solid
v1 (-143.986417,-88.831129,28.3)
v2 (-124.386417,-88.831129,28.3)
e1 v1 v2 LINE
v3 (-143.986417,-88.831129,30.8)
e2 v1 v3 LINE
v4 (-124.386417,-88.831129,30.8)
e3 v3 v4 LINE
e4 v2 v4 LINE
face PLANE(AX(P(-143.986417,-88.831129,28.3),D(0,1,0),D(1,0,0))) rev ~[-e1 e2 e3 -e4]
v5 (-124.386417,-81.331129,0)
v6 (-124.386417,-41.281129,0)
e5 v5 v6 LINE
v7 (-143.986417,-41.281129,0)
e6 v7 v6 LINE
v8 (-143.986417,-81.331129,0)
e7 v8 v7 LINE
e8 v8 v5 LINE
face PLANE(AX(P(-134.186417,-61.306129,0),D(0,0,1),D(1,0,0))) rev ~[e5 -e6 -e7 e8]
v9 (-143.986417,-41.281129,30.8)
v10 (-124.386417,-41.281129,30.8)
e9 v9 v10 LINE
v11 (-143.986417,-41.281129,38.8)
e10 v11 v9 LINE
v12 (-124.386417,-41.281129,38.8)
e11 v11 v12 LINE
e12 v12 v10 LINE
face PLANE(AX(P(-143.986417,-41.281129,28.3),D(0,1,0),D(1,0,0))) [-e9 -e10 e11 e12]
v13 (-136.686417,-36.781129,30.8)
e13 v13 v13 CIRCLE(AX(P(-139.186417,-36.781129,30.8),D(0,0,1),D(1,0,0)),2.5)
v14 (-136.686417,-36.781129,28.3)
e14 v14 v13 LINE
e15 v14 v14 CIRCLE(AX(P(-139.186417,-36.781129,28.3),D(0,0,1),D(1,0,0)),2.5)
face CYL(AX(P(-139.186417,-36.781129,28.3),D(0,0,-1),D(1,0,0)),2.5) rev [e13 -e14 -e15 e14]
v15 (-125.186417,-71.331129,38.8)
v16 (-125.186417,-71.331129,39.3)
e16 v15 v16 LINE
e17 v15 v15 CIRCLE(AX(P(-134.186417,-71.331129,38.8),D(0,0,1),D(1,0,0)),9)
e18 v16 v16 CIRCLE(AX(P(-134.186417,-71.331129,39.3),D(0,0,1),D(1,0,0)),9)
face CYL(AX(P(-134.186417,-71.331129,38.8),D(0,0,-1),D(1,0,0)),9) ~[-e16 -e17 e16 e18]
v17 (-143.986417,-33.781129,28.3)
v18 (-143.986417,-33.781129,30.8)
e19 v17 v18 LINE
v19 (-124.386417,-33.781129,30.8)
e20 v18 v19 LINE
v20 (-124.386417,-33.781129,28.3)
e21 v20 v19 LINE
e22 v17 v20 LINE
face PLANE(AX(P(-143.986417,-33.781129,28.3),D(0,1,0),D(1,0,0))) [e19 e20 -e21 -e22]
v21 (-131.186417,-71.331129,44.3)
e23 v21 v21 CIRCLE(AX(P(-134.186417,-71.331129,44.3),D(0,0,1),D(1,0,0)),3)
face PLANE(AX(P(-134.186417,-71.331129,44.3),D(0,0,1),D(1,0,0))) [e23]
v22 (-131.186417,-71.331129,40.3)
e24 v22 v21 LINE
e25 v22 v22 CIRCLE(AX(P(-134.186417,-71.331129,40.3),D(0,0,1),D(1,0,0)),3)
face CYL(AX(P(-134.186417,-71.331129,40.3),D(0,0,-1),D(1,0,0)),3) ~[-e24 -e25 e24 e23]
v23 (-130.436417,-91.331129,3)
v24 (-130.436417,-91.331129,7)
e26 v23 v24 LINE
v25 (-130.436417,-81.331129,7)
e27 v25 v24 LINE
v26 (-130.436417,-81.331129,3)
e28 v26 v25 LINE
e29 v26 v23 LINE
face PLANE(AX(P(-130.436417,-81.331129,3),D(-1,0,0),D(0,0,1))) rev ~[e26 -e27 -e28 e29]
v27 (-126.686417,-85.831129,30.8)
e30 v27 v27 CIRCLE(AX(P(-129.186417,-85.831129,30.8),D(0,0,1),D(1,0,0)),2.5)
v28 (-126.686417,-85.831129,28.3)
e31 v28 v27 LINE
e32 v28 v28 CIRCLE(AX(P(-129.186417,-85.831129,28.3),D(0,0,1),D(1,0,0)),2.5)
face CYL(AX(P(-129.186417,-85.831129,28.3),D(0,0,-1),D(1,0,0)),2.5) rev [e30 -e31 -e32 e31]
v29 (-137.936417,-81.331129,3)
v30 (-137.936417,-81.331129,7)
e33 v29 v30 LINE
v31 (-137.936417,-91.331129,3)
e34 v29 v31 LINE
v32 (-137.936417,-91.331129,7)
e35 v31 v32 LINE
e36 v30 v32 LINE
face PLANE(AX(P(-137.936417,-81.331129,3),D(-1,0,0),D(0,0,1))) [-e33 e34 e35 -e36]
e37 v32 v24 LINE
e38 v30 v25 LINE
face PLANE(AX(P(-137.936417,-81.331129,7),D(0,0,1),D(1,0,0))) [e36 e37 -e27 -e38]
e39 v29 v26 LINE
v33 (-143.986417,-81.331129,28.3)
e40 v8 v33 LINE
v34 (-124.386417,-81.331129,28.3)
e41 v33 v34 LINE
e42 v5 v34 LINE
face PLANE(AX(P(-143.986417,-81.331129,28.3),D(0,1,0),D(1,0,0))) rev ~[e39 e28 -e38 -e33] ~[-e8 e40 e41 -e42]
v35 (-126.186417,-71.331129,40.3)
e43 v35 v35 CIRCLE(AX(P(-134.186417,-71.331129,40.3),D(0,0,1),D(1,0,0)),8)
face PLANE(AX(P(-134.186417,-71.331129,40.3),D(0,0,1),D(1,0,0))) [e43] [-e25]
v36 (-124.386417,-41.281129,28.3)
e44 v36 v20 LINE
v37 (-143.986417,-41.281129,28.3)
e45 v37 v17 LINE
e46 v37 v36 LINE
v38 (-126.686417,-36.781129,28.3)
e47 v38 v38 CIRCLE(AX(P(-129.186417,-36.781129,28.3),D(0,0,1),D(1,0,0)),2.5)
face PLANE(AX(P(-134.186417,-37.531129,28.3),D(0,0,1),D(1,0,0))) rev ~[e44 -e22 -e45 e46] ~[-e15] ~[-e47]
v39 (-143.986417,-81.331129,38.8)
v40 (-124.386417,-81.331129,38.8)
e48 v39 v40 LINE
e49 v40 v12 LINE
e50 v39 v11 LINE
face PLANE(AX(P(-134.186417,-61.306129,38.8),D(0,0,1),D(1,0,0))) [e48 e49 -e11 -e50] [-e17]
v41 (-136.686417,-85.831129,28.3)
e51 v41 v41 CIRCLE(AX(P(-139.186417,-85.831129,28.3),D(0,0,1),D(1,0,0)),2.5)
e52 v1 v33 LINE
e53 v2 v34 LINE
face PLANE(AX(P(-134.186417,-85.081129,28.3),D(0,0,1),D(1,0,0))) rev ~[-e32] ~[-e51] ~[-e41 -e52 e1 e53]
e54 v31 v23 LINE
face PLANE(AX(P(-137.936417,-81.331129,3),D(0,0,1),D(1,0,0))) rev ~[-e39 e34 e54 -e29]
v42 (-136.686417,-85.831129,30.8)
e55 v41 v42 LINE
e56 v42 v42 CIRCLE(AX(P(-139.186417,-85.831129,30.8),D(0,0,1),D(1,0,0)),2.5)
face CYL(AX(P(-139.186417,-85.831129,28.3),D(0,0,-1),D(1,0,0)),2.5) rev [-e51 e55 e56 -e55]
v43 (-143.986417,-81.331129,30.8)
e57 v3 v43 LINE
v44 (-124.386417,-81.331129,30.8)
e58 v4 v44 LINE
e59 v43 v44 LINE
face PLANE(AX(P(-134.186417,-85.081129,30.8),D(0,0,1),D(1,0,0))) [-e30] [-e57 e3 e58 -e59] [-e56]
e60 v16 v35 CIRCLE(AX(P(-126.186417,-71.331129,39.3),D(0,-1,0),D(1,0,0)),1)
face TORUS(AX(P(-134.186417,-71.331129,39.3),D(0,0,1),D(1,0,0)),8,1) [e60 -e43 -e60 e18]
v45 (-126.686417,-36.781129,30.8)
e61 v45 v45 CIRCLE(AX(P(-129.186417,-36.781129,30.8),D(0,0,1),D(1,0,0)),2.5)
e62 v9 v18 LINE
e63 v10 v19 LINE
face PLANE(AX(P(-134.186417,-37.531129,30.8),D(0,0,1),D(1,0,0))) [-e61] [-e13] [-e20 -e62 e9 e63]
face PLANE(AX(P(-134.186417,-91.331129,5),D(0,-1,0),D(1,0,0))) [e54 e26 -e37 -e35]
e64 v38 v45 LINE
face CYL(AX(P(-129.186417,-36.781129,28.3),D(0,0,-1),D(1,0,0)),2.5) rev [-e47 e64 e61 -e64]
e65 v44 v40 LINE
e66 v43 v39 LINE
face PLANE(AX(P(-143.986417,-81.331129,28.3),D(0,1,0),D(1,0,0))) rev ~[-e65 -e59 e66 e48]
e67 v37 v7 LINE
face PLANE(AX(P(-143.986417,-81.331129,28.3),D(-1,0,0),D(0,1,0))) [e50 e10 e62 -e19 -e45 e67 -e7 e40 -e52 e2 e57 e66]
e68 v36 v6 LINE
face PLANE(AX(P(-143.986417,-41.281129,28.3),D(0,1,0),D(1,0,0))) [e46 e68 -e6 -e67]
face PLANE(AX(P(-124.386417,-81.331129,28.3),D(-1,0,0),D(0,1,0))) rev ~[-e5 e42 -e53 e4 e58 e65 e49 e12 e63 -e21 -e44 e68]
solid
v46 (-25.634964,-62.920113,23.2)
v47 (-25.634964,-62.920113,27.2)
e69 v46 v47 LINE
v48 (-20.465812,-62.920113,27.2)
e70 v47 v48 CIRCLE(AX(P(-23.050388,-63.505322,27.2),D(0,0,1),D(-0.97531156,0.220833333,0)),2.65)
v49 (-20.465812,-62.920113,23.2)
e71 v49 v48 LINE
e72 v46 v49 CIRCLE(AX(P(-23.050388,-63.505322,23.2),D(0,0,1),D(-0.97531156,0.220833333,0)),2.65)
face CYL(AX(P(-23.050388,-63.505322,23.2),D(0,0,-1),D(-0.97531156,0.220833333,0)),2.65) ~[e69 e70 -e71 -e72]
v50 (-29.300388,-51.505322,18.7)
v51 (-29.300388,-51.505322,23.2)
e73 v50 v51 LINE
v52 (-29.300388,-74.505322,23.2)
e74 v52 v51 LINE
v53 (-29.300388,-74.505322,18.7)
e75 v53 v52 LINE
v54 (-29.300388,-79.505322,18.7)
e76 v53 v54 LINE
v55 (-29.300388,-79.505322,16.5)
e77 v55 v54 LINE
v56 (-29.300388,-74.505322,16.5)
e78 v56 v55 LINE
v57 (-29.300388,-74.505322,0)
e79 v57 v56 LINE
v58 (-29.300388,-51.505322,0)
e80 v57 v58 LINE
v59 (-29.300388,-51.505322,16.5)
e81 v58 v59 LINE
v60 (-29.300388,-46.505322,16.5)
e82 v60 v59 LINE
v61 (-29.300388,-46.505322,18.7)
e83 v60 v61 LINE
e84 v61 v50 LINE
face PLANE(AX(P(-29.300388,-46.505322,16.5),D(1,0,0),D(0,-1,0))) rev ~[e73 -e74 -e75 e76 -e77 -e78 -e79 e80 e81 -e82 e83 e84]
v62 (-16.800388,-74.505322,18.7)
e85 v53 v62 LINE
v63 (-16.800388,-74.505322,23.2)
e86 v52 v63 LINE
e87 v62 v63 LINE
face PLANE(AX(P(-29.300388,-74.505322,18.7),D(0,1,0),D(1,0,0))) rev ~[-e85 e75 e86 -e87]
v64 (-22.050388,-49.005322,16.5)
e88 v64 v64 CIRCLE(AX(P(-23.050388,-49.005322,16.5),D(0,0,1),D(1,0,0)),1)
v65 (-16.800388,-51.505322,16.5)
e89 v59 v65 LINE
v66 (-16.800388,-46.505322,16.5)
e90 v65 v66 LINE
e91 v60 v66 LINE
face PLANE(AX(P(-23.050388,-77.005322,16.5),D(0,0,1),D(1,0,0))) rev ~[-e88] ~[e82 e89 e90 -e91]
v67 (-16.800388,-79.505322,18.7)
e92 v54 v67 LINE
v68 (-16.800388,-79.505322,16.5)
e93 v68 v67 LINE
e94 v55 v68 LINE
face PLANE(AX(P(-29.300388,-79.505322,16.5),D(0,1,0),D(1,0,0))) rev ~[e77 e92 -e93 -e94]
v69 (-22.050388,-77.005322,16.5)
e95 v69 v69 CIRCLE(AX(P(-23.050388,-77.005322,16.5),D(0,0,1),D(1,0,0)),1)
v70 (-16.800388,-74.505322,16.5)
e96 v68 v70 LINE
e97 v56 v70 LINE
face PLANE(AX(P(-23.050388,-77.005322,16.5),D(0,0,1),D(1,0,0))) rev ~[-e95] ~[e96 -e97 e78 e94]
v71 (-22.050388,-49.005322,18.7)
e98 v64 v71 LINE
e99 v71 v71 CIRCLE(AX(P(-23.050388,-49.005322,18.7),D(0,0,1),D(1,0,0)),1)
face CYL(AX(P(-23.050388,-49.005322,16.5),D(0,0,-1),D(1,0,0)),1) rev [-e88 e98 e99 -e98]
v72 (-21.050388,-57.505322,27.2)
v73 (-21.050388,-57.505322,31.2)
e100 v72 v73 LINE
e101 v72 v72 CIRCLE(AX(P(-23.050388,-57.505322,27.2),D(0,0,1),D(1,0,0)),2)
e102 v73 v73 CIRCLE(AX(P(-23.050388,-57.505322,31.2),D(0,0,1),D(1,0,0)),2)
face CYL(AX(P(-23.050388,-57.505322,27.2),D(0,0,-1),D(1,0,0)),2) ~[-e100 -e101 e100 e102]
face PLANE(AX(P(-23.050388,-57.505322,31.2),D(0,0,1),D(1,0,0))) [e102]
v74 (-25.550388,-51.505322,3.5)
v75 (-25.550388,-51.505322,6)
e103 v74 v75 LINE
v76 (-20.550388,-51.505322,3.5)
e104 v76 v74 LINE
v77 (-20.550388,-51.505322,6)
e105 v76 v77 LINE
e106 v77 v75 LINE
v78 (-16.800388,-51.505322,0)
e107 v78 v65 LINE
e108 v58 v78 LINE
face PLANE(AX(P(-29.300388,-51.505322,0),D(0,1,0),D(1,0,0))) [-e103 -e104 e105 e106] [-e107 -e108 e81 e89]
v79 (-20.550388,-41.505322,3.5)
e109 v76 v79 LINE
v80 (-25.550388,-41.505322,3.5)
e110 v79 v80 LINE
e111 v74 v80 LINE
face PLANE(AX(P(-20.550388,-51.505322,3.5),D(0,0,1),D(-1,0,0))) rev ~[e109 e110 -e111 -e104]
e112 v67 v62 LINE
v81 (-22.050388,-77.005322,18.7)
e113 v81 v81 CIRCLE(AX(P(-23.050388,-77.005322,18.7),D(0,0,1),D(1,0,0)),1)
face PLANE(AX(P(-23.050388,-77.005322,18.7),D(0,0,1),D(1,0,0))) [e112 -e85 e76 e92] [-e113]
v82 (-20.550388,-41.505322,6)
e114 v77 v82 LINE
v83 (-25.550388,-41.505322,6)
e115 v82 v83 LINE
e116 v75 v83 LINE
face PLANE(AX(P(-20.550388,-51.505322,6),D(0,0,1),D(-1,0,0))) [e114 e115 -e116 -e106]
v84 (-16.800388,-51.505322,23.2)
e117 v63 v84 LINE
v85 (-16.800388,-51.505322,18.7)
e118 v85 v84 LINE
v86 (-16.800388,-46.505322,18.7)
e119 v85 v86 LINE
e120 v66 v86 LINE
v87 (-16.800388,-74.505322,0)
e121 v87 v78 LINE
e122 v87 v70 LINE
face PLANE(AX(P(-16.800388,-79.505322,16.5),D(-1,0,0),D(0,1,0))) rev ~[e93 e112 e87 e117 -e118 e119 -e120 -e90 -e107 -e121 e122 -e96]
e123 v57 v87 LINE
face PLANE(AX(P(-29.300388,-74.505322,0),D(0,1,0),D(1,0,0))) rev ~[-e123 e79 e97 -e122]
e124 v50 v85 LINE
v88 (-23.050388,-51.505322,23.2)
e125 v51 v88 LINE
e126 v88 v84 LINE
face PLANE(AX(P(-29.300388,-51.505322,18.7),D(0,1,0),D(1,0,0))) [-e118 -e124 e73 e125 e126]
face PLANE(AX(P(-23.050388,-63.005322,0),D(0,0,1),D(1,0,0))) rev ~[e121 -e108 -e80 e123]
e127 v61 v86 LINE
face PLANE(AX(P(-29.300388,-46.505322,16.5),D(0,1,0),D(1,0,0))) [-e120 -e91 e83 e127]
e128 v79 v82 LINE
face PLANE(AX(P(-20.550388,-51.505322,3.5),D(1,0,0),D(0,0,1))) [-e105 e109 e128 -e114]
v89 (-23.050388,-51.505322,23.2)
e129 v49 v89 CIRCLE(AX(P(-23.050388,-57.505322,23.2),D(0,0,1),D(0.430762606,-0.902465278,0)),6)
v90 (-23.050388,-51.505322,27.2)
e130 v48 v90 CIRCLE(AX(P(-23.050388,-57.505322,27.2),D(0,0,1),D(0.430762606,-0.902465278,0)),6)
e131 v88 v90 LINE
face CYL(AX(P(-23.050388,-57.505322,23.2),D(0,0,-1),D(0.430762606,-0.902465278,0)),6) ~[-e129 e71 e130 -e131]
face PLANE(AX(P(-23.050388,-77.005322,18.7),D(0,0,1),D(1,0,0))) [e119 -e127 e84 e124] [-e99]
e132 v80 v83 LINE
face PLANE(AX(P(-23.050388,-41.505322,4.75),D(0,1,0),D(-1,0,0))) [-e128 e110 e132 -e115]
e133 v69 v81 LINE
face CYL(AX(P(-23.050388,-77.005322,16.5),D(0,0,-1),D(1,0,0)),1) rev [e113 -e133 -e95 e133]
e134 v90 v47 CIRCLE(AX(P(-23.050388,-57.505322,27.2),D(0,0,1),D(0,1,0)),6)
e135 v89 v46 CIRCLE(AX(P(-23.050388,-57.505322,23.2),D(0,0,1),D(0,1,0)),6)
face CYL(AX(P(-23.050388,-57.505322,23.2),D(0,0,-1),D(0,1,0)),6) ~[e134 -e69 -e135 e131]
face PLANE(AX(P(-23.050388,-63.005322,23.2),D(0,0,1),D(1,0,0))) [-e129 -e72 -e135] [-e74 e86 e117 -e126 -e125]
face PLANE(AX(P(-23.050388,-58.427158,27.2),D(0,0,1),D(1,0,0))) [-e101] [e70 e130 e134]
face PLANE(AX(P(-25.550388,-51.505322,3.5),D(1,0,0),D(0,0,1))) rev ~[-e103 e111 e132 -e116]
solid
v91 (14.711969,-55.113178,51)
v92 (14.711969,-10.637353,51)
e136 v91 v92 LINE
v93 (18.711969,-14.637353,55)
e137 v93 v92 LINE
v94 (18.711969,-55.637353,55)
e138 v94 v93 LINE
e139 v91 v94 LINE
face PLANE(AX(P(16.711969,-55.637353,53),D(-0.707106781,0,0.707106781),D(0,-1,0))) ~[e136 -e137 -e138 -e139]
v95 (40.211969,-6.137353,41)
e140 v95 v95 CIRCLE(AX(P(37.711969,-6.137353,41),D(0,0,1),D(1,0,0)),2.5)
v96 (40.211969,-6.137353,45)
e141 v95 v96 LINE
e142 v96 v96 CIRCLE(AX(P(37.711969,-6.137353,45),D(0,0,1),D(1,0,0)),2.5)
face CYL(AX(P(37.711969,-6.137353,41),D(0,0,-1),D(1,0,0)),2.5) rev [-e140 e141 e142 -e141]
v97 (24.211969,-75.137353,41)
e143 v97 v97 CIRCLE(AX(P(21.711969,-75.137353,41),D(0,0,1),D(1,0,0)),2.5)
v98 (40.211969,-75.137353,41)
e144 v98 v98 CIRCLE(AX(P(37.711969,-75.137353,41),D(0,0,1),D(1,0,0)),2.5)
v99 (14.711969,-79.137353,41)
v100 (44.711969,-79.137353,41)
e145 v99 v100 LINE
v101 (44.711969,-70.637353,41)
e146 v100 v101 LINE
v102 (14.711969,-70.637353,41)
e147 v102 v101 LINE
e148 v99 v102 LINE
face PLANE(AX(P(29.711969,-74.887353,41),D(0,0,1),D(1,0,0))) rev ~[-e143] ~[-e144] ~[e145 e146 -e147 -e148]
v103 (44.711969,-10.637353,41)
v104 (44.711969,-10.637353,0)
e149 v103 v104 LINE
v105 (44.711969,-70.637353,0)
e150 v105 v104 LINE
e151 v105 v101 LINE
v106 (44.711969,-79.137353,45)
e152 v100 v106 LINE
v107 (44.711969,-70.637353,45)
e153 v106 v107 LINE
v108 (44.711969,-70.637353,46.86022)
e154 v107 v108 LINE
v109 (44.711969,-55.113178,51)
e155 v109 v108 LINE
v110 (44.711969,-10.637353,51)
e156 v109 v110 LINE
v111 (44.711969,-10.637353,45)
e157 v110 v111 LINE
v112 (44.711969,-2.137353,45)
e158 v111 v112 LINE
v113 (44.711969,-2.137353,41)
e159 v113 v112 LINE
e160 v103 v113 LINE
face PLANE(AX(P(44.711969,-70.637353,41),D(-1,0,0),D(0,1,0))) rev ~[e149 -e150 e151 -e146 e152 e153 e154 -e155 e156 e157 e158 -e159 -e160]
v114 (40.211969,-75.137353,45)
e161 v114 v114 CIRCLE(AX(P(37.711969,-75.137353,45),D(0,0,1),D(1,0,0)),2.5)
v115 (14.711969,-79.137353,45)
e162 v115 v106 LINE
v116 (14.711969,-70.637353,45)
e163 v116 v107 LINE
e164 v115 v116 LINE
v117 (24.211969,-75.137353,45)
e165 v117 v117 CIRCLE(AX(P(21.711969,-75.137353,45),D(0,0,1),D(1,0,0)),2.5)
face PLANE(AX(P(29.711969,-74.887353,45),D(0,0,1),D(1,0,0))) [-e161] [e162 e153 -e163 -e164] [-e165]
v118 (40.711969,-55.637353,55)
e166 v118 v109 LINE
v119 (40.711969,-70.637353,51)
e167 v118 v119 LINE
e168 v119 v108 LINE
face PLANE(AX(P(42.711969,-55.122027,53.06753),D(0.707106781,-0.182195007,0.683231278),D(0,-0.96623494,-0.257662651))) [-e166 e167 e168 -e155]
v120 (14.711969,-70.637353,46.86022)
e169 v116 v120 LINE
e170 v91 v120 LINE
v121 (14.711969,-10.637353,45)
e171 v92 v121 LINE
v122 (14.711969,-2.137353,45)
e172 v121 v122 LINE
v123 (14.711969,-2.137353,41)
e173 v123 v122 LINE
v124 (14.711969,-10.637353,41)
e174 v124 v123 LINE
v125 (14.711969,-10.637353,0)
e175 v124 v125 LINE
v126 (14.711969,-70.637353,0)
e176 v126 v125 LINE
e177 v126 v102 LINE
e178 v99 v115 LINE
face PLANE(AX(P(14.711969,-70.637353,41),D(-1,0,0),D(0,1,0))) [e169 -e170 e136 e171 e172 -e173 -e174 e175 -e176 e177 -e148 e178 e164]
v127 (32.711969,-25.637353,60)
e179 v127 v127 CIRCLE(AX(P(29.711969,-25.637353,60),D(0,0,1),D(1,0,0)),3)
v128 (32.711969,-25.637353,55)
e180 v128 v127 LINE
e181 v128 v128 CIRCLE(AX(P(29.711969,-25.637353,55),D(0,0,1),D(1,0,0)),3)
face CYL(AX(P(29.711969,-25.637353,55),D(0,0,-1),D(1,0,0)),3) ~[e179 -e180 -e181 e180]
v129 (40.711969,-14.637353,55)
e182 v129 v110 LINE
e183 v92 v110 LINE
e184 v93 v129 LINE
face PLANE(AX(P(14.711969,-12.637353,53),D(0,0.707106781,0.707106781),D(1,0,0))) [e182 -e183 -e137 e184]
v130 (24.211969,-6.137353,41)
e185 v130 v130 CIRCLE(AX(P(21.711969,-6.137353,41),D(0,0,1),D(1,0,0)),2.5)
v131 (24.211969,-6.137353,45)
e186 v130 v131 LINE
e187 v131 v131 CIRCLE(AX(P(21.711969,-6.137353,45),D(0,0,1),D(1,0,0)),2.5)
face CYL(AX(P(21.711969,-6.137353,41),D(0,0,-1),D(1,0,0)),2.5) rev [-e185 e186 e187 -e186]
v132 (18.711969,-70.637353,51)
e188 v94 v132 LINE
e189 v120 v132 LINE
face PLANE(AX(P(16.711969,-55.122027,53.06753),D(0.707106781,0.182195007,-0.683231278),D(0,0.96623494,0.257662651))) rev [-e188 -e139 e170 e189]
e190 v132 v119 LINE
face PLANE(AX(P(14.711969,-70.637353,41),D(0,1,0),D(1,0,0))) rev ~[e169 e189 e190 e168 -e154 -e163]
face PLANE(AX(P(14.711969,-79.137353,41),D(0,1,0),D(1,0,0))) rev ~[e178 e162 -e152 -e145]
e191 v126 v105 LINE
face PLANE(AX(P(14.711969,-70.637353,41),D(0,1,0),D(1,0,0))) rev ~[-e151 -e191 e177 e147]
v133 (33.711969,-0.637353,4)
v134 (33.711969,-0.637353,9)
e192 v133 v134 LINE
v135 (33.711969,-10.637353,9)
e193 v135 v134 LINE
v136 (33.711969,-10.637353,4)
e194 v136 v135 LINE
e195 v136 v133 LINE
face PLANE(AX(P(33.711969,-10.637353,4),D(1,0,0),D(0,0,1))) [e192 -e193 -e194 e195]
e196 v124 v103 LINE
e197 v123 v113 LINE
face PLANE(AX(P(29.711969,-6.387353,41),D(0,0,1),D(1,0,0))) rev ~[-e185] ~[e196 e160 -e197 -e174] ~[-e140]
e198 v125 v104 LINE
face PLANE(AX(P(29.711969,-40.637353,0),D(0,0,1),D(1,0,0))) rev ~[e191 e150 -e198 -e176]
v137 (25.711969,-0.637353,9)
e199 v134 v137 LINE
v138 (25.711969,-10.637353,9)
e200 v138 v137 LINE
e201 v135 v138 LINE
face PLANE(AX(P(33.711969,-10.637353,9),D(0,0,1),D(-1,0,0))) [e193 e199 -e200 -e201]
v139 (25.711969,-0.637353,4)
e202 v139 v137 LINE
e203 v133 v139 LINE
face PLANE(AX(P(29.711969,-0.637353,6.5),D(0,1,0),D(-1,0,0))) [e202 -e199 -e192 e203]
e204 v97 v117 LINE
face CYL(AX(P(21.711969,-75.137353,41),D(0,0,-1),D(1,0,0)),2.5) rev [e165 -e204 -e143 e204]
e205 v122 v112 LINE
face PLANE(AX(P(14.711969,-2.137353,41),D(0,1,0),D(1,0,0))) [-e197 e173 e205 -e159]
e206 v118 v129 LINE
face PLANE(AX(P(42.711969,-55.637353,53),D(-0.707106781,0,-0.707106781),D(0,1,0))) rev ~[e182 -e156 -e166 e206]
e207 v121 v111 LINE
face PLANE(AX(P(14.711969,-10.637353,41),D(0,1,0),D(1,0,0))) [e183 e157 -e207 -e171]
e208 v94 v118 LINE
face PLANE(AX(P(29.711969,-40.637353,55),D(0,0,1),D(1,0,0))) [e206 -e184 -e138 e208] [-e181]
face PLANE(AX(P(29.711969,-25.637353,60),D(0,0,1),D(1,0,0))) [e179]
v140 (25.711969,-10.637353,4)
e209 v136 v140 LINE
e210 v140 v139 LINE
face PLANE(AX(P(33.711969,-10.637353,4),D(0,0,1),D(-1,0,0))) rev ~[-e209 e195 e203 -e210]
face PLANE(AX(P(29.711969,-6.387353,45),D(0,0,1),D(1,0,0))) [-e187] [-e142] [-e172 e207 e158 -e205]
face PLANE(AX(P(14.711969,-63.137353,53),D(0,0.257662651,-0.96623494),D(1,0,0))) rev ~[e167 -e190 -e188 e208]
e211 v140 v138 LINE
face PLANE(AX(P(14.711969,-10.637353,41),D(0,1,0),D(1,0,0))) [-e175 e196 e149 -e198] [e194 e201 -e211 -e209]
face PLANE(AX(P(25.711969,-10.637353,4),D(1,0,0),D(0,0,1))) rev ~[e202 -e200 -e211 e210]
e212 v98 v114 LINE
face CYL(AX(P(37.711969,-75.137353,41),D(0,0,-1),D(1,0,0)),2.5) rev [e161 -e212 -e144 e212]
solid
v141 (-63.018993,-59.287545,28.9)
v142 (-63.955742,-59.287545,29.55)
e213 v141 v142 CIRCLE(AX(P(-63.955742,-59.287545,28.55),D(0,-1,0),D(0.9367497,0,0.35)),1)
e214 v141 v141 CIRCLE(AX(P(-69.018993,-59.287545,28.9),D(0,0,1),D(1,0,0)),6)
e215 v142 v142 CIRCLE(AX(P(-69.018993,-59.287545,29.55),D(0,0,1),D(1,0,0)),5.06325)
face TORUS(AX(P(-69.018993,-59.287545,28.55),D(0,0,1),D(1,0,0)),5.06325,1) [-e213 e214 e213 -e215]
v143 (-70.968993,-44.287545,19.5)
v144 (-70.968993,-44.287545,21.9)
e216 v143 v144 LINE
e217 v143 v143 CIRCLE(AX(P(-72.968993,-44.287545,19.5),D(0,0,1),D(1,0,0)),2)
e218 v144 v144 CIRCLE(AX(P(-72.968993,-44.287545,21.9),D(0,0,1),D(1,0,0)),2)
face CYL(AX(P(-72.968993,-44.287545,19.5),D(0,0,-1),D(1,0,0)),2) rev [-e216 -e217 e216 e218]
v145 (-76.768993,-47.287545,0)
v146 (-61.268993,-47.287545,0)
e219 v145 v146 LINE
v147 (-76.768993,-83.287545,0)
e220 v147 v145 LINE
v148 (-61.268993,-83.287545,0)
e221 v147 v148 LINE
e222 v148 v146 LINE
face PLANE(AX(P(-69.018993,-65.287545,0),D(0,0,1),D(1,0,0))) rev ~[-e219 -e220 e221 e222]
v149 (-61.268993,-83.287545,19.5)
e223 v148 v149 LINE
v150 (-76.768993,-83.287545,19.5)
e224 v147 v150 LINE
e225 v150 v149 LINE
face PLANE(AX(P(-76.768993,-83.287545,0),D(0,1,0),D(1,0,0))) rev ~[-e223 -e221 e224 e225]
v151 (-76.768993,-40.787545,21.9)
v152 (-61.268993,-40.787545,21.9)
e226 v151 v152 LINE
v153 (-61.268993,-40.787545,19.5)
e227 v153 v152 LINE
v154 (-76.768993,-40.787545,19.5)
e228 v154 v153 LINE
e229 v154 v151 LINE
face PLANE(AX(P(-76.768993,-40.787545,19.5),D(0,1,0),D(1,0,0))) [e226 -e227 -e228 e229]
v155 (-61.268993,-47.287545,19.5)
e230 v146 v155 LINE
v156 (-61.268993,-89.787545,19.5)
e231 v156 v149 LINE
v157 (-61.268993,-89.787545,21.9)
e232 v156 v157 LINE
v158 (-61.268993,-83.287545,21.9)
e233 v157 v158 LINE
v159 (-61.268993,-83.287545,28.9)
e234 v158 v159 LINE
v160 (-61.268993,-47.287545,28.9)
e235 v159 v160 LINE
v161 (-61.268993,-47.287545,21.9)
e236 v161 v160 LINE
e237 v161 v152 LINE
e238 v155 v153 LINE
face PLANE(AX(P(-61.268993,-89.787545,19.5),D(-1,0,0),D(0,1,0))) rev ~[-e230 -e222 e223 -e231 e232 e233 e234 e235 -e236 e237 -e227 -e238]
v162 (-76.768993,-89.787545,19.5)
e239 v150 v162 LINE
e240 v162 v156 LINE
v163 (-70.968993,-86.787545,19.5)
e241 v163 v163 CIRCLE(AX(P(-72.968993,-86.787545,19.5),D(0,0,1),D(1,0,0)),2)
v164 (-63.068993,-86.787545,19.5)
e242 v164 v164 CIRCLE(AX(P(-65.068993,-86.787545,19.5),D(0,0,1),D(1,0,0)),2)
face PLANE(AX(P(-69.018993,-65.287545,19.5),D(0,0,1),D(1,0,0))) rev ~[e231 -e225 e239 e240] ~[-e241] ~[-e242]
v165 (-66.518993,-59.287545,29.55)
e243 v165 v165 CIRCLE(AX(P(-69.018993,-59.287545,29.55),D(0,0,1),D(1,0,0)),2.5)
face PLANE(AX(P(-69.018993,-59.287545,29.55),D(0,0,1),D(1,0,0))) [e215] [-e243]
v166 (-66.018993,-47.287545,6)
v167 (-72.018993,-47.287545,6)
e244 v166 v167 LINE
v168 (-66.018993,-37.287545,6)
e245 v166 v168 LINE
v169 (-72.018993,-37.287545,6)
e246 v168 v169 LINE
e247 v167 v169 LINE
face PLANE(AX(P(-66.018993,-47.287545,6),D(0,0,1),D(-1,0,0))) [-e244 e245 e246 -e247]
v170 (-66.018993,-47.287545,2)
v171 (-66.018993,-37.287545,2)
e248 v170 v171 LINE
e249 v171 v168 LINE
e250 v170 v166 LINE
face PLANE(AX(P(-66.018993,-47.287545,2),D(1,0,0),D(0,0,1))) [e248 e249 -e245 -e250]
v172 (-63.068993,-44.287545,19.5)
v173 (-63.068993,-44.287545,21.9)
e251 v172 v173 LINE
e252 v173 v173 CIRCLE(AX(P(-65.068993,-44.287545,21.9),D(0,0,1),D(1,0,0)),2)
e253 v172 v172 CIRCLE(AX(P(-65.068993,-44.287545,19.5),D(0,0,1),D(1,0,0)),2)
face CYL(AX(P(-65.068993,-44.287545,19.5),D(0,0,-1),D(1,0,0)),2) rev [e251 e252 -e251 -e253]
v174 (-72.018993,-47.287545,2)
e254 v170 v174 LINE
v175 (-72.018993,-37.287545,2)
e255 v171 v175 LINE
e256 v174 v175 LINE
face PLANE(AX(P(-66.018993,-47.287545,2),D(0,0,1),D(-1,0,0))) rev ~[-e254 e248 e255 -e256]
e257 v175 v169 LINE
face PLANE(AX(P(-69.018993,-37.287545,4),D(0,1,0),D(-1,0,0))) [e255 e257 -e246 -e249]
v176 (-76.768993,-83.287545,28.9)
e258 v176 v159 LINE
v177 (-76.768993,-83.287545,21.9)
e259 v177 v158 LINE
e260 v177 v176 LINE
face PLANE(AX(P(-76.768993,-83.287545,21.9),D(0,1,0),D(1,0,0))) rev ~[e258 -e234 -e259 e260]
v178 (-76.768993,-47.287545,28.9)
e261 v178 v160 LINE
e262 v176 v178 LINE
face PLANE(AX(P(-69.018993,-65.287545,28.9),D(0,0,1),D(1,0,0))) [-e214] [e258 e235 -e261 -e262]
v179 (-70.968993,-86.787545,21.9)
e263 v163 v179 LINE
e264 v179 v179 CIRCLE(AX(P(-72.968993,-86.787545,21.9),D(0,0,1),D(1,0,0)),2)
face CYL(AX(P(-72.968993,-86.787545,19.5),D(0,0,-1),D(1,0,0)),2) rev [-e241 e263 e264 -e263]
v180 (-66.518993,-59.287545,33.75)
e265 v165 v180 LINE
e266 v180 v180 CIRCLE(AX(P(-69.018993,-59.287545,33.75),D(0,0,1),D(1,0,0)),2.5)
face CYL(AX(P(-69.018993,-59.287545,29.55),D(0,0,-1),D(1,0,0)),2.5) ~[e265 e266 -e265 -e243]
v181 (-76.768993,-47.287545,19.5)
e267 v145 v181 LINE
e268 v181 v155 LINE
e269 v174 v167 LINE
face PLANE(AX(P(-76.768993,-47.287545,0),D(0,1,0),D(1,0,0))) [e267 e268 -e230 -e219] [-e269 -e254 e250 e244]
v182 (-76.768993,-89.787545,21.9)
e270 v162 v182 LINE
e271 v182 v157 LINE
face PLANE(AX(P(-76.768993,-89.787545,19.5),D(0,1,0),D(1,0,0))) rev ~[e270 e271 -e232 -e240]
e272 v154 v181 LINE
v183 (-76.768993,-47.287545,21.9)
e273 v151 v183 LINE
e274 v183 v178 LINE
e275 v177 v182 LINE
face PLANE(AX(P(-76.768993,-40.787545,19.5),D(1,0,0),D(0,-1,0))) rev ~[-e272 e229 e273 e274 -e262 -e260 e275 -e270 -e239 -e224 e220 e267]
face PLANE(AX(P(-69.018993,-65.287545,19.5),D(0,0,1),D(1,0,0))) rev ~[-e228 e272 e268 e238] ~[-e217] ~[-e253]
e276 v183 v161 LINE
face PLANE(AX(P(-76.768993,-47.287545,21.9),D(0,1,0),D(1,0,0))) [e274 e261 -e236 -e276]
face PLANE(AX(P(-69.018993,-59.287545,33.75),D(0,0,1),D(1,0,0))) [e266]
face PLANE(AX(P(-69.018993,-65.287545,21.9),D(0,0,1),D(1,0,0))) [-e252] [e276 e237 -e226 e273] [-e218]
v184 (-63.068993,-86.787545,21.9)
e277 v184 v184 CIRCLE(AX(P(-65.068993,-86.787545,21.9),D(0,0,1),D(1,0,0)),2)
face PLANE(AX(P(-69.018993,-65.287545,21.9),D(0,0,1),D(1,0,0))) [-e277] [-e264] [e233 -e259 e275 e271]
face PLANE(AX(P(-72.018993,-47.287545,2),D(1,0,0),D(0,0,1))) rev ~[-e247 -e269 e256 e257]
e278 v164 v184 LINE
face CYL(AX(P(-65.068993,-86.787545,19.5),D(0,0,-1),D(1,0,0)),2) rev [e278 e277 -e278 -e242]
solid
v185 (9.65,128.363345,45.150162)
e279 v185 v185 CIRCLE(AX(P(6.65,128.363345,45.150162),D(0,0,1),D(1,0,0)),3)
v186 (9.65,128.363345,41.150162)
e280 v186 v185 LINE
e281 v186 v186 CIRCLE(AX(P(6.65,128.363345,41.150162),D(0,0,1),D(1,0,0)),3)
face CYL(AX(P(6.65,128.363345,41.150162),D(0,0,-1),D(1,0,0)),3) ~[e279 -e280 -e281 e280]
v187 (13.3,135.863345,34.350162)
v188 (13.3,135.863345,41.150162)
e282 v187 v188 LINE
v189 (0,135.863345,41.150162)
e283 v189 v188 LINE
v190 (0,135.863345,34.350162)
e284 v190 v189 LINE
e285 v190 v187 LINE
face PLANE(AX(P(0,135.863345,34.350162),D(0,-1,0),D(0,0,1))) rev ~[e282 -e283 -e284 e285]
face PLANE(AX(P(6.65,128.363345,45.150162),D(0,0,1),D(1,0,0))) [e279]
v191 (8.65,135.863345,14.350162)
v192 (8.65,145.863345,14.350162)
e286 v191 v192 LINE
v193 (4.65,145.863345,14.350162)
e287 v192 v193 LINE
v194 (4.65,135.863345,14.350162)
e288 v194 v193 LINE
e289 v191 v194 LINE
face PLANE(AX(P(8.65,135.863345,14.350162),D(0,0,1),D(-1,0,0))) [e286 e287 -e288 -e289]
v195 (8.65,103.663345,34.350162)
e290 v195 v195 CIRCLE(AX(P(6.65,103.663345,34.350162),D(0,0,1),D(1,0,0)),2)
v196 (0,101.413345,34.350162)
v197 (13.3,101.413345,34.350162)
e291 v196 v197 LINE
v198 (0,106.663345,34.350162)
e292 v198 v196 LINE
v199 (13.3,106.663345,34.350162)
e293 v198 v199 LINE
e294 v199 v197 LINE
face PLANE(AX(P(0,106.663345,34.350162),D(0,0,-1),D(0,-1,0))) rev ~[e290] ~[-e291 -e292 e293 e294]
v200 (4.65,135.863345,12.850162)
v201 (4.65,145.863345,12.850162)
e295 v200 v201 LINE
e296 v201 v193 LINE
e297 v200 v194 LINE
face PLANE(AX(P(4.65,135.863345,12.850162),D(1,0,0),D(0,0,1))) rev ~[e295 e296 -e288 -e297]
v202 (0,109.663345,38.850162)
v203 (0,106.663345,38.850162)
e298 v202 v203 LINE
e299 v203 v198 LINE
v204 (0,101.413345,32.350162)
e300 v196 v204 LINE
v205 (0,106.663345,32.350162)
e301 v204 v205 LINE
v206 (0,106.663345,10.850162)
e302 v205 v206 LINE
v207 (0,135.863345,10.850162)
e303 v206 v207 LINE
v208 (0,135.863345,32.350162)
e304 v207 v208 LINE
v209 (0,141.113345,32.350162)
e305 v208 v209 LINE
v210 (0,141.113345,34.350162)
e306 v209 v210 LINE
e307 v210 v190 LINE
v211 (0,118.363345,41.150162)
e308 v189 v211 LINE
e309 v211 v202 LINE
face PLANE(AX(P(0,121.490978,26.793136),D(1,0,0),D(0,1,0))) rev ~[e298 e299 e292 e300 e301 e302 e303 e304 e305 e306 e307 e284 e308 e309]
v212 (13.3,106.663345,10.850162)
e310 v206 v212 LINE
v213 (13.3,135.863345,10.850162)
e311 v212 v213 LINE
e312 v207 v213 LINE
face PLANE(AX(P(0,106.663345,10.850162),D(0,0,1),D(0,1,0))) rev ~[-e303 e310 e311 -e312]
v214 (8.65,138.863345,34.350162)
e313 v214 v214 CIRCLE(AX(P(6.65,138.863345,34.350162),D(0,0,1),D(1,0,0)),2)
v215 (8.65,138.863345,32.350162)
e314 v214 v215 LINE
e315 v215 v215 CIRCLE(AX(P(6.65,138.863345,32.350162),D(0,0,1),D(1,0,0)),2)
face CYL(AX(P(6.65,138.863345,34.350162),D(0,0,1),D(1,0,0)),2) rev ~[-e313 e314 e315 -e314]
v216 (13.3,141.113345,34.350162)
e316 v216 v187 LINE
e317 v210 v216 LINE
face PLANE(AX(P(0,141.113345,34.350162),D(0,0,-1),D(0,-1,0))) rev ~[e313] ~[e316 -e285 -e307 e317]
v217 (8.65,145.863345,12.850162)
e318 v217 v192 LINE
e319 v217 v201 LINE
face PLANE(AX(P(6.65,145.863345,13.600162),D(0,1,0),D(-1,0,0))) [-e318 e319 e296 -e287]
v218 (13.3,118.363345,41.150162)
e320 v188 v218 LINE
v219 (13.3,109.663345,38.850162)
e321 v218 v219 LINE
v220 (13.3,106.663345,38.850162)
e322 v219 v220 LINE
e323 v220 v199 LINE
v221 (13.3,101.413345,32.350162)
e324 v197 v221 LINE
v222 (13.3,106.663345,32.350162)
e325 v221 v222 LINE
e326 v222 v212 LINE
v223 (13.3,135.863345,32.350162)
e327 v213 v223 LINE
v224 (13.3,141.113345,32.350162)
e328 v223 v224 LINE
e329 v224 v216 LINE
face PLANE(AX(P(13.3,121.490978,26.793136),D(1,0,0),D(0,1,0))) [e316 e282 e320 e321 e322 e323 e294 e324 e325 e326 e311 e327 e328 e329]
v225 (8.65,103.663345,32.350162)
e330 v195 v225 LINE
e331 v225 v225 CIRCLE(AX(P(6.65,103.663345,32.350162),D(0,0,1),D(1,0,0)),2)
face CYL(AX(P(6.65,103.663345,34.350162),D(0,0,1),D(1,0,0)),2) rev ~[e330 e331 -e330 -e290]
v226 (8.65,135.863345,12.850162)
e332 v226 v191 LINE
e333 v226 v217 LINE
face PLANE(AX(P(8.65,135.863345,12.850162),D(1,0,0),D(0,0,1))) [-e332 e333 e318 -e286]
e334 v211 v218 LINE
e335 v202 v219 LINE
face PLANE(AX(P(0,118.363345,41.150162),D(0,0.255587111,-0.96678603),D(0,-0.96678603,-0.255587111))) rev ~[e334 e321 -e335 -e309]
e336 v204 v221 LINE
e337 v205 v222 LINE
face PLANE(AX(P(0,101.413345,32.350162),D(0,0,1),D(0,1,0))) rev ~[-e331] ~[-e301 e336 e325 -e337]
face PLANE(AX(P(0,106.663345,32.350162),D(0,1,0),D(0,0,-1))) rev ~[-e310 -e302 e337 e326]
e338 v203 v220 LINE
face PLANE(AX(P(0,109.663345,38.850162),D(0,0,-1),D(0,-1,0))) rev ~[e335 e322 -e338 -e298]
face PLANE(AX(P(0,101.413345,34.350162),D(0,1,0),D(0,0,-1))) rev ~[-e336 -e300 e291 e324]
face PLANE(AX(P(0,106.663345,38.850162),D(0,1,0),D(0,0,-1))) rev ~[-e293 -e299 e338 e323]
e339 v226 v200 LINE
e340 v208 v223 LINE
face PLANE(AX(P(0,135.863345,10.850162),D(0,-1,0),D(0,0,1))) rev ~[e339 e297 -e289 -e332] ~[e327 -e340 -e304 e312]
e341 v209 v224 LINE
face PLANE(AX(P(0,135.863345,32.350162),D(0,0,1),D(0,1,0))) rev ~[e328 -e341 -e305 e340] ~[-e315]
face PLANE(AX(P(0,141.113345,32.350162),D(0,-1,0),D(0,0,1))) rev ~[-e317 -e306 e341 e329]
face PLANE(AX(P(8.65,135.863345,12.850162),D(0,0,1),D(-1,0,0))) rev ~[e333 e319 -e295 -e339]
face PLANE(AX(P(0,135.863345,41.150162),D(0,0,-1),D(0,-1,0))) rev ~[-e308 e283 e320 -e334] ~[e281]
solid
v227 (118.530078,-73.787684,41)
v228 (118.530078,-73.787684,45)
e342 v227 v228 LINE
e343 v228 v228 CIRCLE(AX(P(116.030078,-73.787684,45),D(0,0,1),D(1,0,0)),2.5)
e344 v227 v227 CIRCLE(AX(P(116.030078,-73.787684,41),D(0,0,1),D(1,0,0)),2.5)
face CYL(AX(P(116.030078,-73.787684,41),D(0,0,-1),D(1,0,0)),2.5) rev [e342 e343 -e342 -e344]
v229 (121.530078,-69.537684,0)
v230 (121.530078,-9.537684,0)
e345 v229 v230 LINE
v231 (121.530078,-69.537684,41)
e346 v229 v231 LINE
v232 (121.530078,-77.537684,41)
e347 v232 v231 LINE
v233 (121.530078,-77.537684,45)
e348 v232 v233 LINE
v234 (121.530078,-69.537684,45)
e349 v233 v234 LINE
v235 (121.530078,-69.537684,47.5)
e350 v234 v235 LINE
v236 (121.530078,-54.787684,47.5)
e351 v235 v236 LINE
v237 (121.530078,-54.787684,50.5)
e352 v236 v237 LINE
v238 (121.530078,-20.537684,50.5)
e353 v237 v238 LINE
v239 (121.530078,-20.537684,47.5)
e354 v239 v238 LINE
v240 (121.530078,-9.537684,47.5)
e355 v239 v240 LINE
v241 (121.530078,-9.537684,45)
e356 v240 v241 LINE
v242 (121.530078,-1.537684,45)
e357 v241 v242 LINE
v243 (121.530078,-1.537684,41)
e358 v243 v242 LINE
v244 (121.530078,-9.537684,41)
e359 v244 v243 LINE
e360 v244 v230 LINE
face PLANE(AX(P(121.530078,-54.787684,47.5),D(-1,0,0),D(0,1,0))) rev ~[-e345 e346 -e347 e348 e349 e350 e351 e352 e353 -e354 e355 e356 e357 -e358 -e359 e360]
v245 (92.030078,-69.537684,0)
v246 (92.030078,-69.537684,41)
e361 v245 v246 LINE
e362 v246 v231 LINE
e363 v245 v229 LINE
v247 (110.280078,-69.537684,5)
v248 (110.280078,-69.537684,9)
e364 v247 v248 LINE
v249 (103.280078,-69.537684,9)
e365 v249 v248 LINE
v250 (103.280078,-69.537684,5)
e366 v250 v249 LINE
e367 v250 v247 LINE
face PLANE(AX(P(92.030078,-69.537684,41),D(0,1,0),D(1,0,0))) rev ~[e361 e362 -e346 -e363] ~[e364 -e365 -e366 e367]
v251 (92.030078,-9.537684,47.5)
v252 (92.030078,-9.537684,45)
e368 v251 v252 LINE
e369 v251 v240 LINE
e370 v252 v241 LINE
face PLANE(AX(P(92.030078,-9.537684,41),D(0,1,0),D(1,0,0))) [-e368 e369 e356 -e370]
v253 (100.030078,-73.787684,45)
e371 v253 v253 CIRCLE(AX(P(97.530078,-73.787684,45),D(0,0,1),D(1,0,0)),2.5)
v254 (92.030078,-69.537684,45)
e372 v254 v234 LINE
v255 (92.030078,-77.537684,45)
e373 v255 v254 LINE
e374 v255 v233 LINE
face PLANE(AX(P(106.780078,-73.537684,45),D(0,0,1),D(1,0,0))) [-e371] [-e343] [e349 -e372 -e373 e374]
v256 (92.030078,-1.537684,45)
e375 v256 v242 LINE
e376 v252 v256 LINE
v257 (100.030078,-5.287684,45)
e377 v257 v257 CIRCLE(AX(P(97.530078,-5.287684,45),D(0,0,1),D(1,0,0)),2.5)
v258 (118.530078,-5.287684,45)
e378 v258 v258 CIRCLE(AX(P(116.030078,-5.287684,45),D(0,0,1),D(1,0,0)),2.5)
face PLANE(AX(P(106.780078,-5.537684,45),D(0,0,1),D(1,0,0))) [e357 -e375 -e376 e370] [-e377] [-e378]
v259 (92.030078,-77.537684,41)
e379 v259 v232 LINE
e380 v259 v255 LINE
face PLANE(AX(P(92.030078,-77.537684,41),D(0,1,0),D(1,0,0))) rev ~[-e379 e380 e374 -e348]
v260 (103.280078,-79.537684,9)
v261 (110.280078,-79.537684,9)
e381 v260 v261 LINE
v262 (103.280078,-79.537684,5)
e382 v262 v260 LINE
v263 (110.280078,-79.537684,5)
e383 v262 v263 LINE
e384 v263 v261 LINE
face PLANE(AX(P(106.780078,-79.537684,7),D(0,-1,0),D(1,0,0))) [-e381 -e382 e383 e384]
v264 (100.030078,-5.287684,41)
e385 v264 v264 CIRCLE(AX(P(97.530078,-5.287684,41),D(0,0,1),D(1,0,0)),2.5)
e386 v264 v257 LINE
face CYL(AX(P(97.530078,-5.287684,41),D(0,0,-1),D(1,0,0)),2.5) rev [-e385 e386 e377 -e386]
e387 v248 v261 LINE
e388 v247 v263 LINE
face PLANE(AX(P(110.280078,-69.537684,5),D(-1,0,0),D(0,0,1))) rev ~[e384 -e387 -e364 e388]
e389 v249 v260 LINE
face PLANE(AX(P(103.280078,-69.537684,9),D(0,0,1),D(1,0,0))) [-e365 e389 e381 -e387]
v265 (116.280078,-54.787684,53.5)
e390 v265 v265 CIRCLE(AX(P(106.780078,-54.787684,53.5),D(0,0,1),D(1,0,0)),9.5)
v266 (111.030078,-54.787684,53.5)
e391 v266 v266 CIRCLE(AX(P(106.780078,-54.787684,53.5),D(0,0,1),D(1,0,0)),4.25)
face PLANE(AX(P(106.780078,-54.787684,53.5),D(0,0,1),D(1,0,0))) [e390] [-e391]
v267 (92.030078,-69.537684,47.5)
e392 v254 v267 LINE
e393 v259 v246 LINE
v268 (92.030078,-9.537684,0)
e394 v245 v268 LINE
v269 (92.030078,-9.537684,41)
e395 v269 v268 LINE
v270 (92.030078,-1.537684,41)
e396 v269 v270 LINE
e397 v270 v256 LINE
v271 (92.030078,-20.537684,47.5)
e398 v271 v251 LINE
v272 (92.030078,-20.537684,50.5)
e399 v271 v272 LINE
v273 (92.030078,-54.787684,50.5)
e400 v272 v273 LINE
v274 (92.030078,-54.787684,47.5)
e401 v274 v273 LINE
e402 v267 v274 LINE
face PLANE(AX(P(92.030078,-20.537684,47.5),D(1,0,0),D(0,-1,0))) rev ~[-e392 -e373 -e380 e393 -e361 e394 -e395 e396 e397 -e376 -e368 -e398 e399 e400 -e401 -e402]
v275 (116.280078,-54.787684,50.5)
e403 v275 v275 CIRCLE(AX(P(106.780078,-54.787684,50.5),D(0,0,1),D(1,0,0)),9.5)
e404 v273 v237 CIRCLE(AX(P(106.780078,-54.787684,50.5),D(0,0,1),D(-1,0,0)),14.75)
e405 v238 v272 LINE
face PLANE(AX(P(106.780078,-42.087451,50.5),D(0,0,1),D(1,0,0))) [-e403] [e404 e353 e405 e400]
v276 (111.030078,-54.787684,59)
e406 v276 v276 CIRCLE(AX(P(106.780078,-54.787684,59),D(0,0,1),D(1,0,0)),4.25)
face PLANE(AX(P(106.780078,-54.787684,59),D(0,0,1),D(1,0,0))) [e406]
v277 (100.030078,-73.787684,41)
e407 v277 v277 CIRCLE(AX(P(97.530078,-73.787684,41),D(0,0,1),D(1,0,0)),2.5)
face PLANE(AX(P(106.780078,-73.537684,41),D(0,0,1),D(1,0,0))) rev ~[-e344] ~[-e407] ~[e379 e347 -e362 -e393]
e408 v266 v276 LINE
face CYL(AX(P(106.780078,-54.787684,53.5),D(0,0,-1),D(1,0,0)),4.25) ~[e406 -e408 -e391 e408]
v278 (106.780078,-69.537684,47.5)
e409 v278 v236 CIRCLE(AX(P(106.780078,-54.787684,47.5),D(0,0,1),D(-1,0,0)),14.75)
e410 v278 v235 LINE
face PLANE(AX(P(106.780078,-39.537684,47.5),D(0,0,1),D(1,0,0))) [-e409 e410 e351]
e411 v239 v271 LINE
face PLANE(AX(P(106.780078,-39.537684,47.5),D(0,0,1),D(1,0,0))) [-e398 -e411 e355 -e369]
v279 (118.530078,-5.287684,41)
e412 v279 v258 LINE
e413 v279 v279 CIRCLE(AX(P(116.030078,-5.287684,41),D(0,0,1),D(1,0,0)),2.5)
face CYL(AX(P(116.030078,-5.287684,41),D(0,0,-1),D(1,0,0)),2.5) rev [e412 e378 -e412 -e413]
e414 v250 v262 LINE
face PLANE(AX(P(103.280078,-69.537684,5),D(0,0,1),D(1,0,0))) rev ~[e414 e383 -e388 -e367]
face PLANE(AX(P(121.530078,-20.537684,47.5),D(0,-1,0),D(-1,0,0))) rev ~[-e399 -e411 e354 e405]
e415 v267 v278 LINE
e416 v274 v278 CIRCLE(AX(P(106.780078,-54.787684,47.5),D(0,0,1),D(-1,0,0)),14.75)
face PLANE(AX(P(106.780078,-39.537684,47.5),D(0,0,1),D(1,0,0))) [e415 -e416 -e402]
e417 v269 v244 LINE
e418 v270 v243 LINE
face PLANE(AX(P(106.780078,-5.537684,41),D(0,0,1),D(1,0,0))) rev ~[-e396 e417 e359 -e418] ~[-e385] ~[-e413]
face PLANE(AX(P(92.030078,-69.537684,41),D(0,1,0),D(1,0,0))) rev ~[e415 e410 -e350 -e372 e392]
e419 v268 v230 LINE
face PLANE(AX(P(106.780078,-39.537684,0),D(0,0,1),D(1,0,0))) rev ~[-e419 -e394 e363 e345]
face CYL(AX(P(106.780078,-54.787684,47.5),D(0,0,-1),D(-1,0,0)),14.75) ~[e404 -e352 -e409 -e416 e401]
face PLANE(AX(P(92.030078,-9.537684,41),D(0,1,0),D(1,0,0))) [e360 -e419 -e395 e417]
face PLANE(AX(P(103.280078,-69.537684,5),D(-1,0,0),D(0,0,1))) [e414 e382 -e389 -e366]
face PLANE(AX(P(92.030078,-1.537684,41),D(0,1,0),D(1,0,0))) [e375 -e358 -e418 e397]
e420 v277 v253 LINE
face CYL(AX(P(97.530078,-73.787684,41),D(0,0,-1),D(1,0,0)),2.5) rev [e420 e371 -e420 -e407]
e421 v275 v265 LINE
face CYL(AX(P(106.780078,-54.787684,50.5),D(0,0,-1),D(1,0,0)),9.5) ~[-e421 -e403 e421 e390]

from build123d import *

# Parameters (mm, degrees)
F0_W      = 19.6
F0_H      = 40.05
F1_DEPTH  = 28.3
F2_W      = 19.6
F2_H      = 40.05
F3_DEPTH  = 10.5
F2_H_2    = 7.5
F2_R      = 2.5
F4_DEPTH  = 2.5
F5_R      = 9
F6_DEPTH  = 1.5
F7_R      = 1
F8_R      = 3
F9_DEPTH  = 4
F10_W     = 7.5
F10_H     = 4
F11_DEPTH = 10
F12_W     = 15.5
F12_H     = 36
F13_DEPTH = 19.5
F14_W     = 15.5
F14_H     = 36
F14_H_2   = 6.5
F14_R     = 2
F15_DEPTH = 2.4
F16_W     = 15.5
F16_H     = 36
F17_DEPTH = 7
F18_R     = 6
F19_DEPTH = 0.65
F21_R     = 2.5
F22_DEPTH = 4.2
F23_W     = 6
F23_H     = 4
F24_DEPTH = 10
F25_W     = 12.5
F25_H     = 23
F26_DEPTH = 16.5
F27_W     = 12.5
F27_H     = 5
F27_R     = 1
F27_H_2   = 23
F28_DEPTH = 2.2
F29_W     = 12.5
F29_H     = 23
F30_DEPTH = 4.5
F32_DEPTH = 4
F33_R     = 2
F34_DEPTH = 4
F35_W     = 5
F35_H     = 2.5
F36_DEPTH = 10
F38_DEPTH = 13.3
F39_R     = 3
F40_DEPTH = 4
F41_R     = 2
F42_DEPTH = 34.3511621783
F43_W     = 4
F43_H     = 1.5
F44_DEPTH = 10
F45_W     = 30
F45_H     = 60
F46_DEPTH = 41
F47_W     = 30
F47_H     = 60
F48_DEPTH = 14
F47_H_2   = 8.5
F47_R     = 2.5
F49_DEPTH = 4
F50_R     = 3
F51_DEPTH = 5
F52_SIZE2 = 4
F52_SIZE  = 15
F53_SIZE  = 4
F54_W     = 8
F54_H     = 5
F55_DEPTH = 10
F56_W     = 29.5
F56_H     = 60
F57_DEPTH = 41
F58_W     = 29.5
F58_H     = 60
F59_DEPTH = 6.5
F58_H_2   = 8
F58_R     = 2.5
F60_DEPTH = 4
F62_DEPTH = 3
F63_R     = 9.5
F64_DEPTH = 3
F65_R     = 4.25
F66_DEPTH = 5.5
F67_W     = 7
F67_H     = 4
F68_DEPTH = 10


# Not quite as in the source:
# - a fillet or chamfer that OpenCascade refuses, or shapes differently, is made with other operations: its cross-section is extruded or revolved along the edge and cut away or added


with BuildPart() as f1:
    # F0 (on Top) → F1 (new body)
    with BuildSketch(Plane.XY):
        with Locations((-134.1864168644, -61.3061293165)):
            Rectangle(F0_W, F0_H)
    extrude(amount=F1_DEPTH)

    # F2 (on face) → F3 (join)
    with BuildSketch(Plane.XY.offset(28.3)):
        with Locations((-134.1864168644, -61.3061293165)):
            Rectangle(F2_W, F2_H)
    extrude(amount=F3_DEPTH)

    # F2 (on face) → F4 (join)
    with BuildSketch(Plane.XY.offset(28.3)):
        with Locations((-134.1864168644, -37.5311293165)):
            Rectangle(F2_W, F2_H_2)
        with Locations((-139.1864168644, -36.7811293165)):
            Circle(F2_R, mode=Mode.SUBTRACT)
        with Locations((-129.1864168644, -36.7811293165)):
            Circle(F2_R, mode=Mode.SUBTRACT)
        with Locations((-134.1864168644, -85.0811293165)):
            Rectangle(F2_W, F2_H_2)
        with Locations((-139.1864168644, -85.8311293165)):
            Circle(F2_R, mode=Mode.SUBTRACT)
        with Locations((-129.1864168644, -85.8311293165)):
            Circle(F2_R, mode=Mode.SUBTRACT)
    extrude(amount=F4_DEPTH)

    # F5 (on face) → F6 (join)
    with BuildSketch(Plane.XY.offset(38.8)):
        with Locations((-134.1864168644, -71.3311293165)):
            Circle(F5_R)
    extrude(amount=F6_DEPTH)

    # F7
    f7_edges = [f1.edges().sort_by_distance(p)[0] for p in [
        (-143.186417, -71.331129, 40.3),
    ]]
    fillet(f7_edges, radius=F7_R)

    # F8 (on face) → F9 (join)
    with BuildSketch(Plane.XY.offset(40.3)):
        with Locations((-134.1864168644, -71.3311293165)):
            Circle(F8_R)
    extrude(amount=F9_DEPTH)

    # F10 (on face) → F11 (join)
    with BuildSketch(Plane.XZ.offset(81.3311293165)):
        with Locations((-134.1864168644, 5)):
            Rectangle(F10_W, F10_H)
    extrude(amount=F11_DEPTH)


with BuildPart() as f13:
    # F12 (on Top) → F13 (new body)
    with BuildSketch(Plane.XY):
        with Locations((-69.018992722, -65.2875445485)):
            Rectangle(F12_W, F12_H)
    extrude(amount=F13_DEPTH)

    # F14 (on face) → F15 (join)
    with BuildSketch(Plane.XY.offset(19.5)):
        with Locations((-69.018992722, -65.2875445485)):
            Rectangle(F14_W, F14_H)
        with Locations((-69.018992722, -86.5375445485)):
            Rectangle(F14_W, F14_H_2)
        with Locations((-72.968992722, -86.7875445485)):
            Circle(F14_R, mode=Mode.SUBTRACT)
        with Locations((-65.068992722, -86.7875445485)):
            Circle(F14_R, mode=Mode.SUBTRACT)
        with Locations((-69.018992722, -44.0375445485)):
            Rectangle(F14_W, F14_H_2)
        with Locations((-72.968992722, -44.2875445485)):
            Circle(F14_R, mode=Mode.SUBTRACT)
        with Locations((-65.068992722, -44.2875445485)):
            Circle(F14_R, mode=Mode.SUBTRACT)
    extrude(amount=F15_DEPTH)

    # F16 (on face) → F17 (join)
    with BuildSketch(Plane.XY.offset(21.9)):
        with Locations((-69.018992722, -65.2875445485)):
            Rectangle(F16_W, F16_H)
    extrude(amount=F17_DEPTH)

    # F18 (on face) → F19 (join)
    with BuildSketch(Plane.XY.offset(28.9)):
        with Locations((-69.018992722, -59.2875445485)):
            Circle(F18_R)
    extrude(amount=F19_DEPTH)

    # F20: fillet of radius 1 on 1 edges, made by hand

    # F20_s1 → F20_t2 (revolve, cut)
    with BuildSketch(Plane.XZ.offset(59.2875445485)):
        with BuildLine():
            ThreePointArc((-63.018992722, 28.9), (-63.3856547092, 29.3715838363), (-63.9557424218, 29.55))
            Line((-63.9557424218, 29.55), (-63.018992722, 29.55))
            Line((-63.018992722, 29.55), (-63.018992722, 28.9))
        make_face()
    revolve(axis=Axis((-69.018992722, -59.2875445485, 29.55), (0, 0, 1)), mode=Mode.SUBTRACT)

    # F21 (on face) → F22 (join)
    with BuildSketch(Plane.XY.offset(29.55)):
        with Locations((-69.018992722, -59.2875445485)):
            Circle(F21_R)
    extrude(amount=F22_DEPTH)

    # F23 (on face) → F24 (join)
    with BuildSketch(Plane(origin=(0, -47.2875445485, 0), x_dir=(-1, 0, 0), z_dir=(0, 1, 0))):
        with Locations((69.018992722, 4)):
            Rectangle(F23_W, F23_H)
    extrude(amount=F24_DEPTH)


with BuildPart() as f26:
    # F25 (on Top) → F26 (new body)
    with BuildSketch(Plane.XY):
        with Locations((-23.0503879488, -63.0053216815)):
            Rectangle(F25_W, F25_H)
    extrude(amount=F26_DEPTH)

    # F27 (on face) → F28 (join)
    with BuildSketch(Plane.XY.offset(16.5)):
        with Locations((-23.0503879488, -77.0053216815)):
            Rectangle(F27_W, F27_H)
        with Locations((-23.0503879488, -77.0053216815)):
            Circle(F27_R, mode=Mode.SUBTRACT)
        with Locations((-23.0503879488, -63.0053216815)):
            Rectangle(F27_W, F27_H_2)
        with Locations((-23.0503879488, -49.0053216815)):
            Rectangle(F27_W, F27_H)
        with Locations((-23.0503879488, -49.0053216815)):
            Circle(F27_R, mode=Mode.SUBTRACT)
    extrude(amount=F28_DEPTH)

    # F29 (on face) → F30 (join)
    with BuildSketch(Plane.XY.offset(18.7)):
        with Locations((-23.0503879488, -63.0053216815)):
            Rectangle(F29_W, F29_H)
    extrude(amount=F30_DEPTH)

    # F31 (on face) → F32 (join)
    with BuildSketch(Plane.XY.offset(23.2)):
        with BuildLine():
            ThreePointArc((-25.6349635825, -62.9201133482), (-23.0503879488, -66.1553216815), (-20.465812315, -62.9201133482))
            ThreePointArc((-20.465812315, -62.9201133482), (-17.1985185893, -56.1803216815), (-23.0503879488, -51.5053216815))
            ThreePointArc((-23.0503879488, -51.5053216815), (-28.9022573082, -56.1803216815), (-25.6349635825, -62.9201133482))
        make_face()
    extrude(amount=F32_DEPTH)

    # F33 (on face) → F34 (join)
    with BuildSketch(Plane.XY.offset(27.2)):
        with Locations((-23.0503879488, -57.5053216815)):
            Circle(F33_R)
    extrude(amount=F34_DEPTH)

    # F35 (on face) → F36 (join)
    with BuildSketch(Plane(origin=(0, -51.5053216815, 0), x_dir=(-1, 0, 0), z_dir=(0, 1, 0))):
        with Locations((23.0503879488, 4.75)):
            Rectangle(F35_W, F35_H)
    extrude(amount=F36_DEPTH)


with BuildPart() as f38:
    # F37 (on Right) → F38 (new body)
    with BuildSketch(Plane.YZ):
        Polygon((106.6633449197, 32.3501621783), (106.6633449197, 10.8501621783), (135.8633449197, 10.8501621783), (135.8633449197, 32.3501621783), (141.1133449197, 32.3501621783), (141.1133449197, 34.3501621783), (135.8633449197, 34.3501621783), (135.8633449197, 41.1501621783), (118.3633449197, 41.1501621783), (109.6633449197, 38.8501621783), (106.6633449197, 38.8501621783), (106.6633449197, 34.3501621783), (101.4133449197, 34.3501621783), (101.4133449197, 32.3501621783), align=None)
    extrude(amount=F38_DEPTH)

    # F39 (on face) → F40 (join)
    with BuildSketch(Plane.XY.offset(41.1501621783)):
        with Locations((6.65, 128.3633449197)):
            Circle(F39_R)
    extrude(amount=F40_DEPTH)

    # F41 (on face) → F42 (cut, through all)
    with BuildSketch(Plane.XY.offset(34.3501621783)):
        with Locations((6.65, 103.6633449197)):
            Circle(F41_R)
        with Locations((6.65, 138.8633449197)):
            Circle(F41_R)
    extrude(amount=-F42_DEPTH, mode=Mode.SUBTRACT)

    # F43 (on face) → F44 (join)
    with BuildSketch(Plane(origin=(0, 135.8633449197, 0), x_dir=(-1, 0, 0), z_dir=(0, 1, 0))):
        with Locations((-6.65, 13.6001621783)):
            Rectangle(F43_W, F43_H)
    extrude(amount=F44_DEPTH)


with BuildPart() as f46:
    # F45 (on Top) → F46 (new body)
    with BuildSketch(Plane.XY):
        with Locations((29.7119686007, -40.6373527646)):
            Rectangle(F45_W, F45_H)
    extrude(amount=F46_DEPTH)

    # F47 (on face) → F48 (join)
    with BuildSketch(Plane.XY.offset(41)):
        with Locations((29.7119686007, -40.6373527646)):
            Rectangle(F47_W, F47_H)
    extrude(amount=F48_DEPTH)

    # F47 (on face) → F49 (join)
    with BuildSketch(Plane.XY.offset(41)):
        with Locations((29.7119686007, -74.8873527646)):
            Rectangle(F47_W, F47_H_2)
        with Locations((21.7119686007, -75.1373527646)):
            Circle(F47_R, mode=Mode.SUBTRACT)
        with Locations((37.7119686007, -75.1373527646)):
            Circle(F47_R, mode=Mode.SUBTRACT)
        with Locations((29.7119686007, -6.3873527646)):
            Rectangle(F47_W, F47_H_2)
        with Locations((21.7119686007, -6.1373527646)):
            Circle(F47_R, mode=Mode.SUBTRACT)
        with Locations((37.7119686007, -6.1373527646)):
            Circle(F47_R, mode=Mode.SUBTRACT)
    extrude(amount=F49_DEPTH)

    # F50 (on face) → F51 (join)
    with BuildSketch(Plane.XY.offset(55)):
        with Locations((29.7119686007, -25.6373527646)):
            Circle(F50_R)
    extrude(amount=F51_DEPTH)

    # F52
    f52_edges = [f46.edges().sort_by_distance(p)[0] for p in [
        (29.711969, -70.637353, 55),
    ]]
    f52_side = f46.faces().sort_by_distance((29.711969, -40.876732, 55))[0]
    chamfer(f52_edges, length=F52_SIZE, length2=F52_SIZE2, reference=f52_side)

    # F53
    f53_edges = [f46.edges().sort_by_distance(p)[0] for p in [
        (44.711969, -63.137353, 53),
        (44.711969, -33.137353, 55),
        (29.711969, -10.637353, 55),
        (14.711969, -33.137353, 55),
        (14.711969, -63.137353, 53),
    ]]
    chamfer(f53_edges, length=F53_SIZE)

    # F54 (on face) → F55 (join)
    with BuildSketch(Plane(origin=(0, -10.6373527646, 0), x_dir=(-1, 0, 0), z_dir=(0, 1, 0))):
        with Locations((-29.7119686007, 6.5)):
            Rectangle(F54_W, F54_H)
    extrude(amount=F55_DEPTH)


with BuildPart() as f57:
    # F56 (on Top) → F57 (new body)
    with BuildSketch(Plane.XY):
        with Locations((106.7800781727, -39.5376843214)):
            Rectangle(F56_W, F56_H)
    extrude(amount=F57_DEPTH)

    # F58 (on face) → F59 (join)
    with BuildSketch(Plane.XY.offset(41)):
        with Locations((106.7800781727, -39.5376843214)):
            Rectangle(F58_W, F58_H)
    extrude(amount=F59_DEPTH)

    # F58 (on face) → F60 (join)
    with BuildSketch(Plane.XY.offset(41)):
        with Locations((106.7800781727, -73.5376843214)):
            Rectangle(F58_W, F58_H_2)
        with Locations((97.5300781727, -73.7876843214)):
            Circle(F58_R, mode=Mode.SUBTRACT)
        with Locations((116.0300781727, -73.7876843214)):
            Circle(F58_R, mode=Mode.SUBTRACT)
        with Locations((106.7800781727, -5.5376843214)):
            Rectangle(F58_W, F58_H_2)
        with Locations((97.5300781727, -5.2876843214)):
            Circle(F58_R, mode=Mode.SUBTRACT)
        with Locations((116.0300781727, -5.2876843214)):
            Circle(F58_R, mode=Mode.SUBTRACT)
    extrude(amount=F60_DEPTH)

    # F61 (on face) → F62 (join)
    with BuildSketch(Plane.XY.offset(47.5)):
        with BuildLine():
            Line((92.0300781727, -20.5376843214), (92.0300781727, -54.7876843214))
            ThreePointArc((92.0300781727, -54.7876843214), (96.3502531502, -65.2175093439), (106.7800781727, -69.5376843214))
            ThreePointArc((106.7800781727, -69.5376843214), (117.2099031952, -65.2175093439), (121.5300781727, -54.7876843214))
            Line((121.5300781727, -54.7876843214), (121.5300781727, -20.5376843214))
            Line((121.5300781727, -20.5376843214), (92.0300781727, -20.5376843214))
        make_face()
    extrude(amount=F62_DEPTH)

    # F63 (on face) → F64 (join)
    with BuildSketch(Plane.XY.offset(50.5)):
        with Locations((106.7800781727, -54.7876843214)):
            Circle(F63_R)
    extrude(amount=F64_DEPTH)

    # F65 (on face) → F66 (join)
    with BuildSketch(Plane.XY.offset(53.5)):
        with Locations((106.7800781727, -54.7876843214)):
            Circle(F65_R)
    extrude(amount=F66_DEPTH)

    # F67 (on face) → F68 (join)
    with BuildSketch(Plane.XZ.offset(69.5376843214)):
        with Locations((106.7800781727, 7)):
            Rectangle(F67_W, F67_H)
    extrude(amount=F68_DEPTH)


solid = Compound([f1.part, f13.part, f26.part, f38.part, f46.part, f57.part])
